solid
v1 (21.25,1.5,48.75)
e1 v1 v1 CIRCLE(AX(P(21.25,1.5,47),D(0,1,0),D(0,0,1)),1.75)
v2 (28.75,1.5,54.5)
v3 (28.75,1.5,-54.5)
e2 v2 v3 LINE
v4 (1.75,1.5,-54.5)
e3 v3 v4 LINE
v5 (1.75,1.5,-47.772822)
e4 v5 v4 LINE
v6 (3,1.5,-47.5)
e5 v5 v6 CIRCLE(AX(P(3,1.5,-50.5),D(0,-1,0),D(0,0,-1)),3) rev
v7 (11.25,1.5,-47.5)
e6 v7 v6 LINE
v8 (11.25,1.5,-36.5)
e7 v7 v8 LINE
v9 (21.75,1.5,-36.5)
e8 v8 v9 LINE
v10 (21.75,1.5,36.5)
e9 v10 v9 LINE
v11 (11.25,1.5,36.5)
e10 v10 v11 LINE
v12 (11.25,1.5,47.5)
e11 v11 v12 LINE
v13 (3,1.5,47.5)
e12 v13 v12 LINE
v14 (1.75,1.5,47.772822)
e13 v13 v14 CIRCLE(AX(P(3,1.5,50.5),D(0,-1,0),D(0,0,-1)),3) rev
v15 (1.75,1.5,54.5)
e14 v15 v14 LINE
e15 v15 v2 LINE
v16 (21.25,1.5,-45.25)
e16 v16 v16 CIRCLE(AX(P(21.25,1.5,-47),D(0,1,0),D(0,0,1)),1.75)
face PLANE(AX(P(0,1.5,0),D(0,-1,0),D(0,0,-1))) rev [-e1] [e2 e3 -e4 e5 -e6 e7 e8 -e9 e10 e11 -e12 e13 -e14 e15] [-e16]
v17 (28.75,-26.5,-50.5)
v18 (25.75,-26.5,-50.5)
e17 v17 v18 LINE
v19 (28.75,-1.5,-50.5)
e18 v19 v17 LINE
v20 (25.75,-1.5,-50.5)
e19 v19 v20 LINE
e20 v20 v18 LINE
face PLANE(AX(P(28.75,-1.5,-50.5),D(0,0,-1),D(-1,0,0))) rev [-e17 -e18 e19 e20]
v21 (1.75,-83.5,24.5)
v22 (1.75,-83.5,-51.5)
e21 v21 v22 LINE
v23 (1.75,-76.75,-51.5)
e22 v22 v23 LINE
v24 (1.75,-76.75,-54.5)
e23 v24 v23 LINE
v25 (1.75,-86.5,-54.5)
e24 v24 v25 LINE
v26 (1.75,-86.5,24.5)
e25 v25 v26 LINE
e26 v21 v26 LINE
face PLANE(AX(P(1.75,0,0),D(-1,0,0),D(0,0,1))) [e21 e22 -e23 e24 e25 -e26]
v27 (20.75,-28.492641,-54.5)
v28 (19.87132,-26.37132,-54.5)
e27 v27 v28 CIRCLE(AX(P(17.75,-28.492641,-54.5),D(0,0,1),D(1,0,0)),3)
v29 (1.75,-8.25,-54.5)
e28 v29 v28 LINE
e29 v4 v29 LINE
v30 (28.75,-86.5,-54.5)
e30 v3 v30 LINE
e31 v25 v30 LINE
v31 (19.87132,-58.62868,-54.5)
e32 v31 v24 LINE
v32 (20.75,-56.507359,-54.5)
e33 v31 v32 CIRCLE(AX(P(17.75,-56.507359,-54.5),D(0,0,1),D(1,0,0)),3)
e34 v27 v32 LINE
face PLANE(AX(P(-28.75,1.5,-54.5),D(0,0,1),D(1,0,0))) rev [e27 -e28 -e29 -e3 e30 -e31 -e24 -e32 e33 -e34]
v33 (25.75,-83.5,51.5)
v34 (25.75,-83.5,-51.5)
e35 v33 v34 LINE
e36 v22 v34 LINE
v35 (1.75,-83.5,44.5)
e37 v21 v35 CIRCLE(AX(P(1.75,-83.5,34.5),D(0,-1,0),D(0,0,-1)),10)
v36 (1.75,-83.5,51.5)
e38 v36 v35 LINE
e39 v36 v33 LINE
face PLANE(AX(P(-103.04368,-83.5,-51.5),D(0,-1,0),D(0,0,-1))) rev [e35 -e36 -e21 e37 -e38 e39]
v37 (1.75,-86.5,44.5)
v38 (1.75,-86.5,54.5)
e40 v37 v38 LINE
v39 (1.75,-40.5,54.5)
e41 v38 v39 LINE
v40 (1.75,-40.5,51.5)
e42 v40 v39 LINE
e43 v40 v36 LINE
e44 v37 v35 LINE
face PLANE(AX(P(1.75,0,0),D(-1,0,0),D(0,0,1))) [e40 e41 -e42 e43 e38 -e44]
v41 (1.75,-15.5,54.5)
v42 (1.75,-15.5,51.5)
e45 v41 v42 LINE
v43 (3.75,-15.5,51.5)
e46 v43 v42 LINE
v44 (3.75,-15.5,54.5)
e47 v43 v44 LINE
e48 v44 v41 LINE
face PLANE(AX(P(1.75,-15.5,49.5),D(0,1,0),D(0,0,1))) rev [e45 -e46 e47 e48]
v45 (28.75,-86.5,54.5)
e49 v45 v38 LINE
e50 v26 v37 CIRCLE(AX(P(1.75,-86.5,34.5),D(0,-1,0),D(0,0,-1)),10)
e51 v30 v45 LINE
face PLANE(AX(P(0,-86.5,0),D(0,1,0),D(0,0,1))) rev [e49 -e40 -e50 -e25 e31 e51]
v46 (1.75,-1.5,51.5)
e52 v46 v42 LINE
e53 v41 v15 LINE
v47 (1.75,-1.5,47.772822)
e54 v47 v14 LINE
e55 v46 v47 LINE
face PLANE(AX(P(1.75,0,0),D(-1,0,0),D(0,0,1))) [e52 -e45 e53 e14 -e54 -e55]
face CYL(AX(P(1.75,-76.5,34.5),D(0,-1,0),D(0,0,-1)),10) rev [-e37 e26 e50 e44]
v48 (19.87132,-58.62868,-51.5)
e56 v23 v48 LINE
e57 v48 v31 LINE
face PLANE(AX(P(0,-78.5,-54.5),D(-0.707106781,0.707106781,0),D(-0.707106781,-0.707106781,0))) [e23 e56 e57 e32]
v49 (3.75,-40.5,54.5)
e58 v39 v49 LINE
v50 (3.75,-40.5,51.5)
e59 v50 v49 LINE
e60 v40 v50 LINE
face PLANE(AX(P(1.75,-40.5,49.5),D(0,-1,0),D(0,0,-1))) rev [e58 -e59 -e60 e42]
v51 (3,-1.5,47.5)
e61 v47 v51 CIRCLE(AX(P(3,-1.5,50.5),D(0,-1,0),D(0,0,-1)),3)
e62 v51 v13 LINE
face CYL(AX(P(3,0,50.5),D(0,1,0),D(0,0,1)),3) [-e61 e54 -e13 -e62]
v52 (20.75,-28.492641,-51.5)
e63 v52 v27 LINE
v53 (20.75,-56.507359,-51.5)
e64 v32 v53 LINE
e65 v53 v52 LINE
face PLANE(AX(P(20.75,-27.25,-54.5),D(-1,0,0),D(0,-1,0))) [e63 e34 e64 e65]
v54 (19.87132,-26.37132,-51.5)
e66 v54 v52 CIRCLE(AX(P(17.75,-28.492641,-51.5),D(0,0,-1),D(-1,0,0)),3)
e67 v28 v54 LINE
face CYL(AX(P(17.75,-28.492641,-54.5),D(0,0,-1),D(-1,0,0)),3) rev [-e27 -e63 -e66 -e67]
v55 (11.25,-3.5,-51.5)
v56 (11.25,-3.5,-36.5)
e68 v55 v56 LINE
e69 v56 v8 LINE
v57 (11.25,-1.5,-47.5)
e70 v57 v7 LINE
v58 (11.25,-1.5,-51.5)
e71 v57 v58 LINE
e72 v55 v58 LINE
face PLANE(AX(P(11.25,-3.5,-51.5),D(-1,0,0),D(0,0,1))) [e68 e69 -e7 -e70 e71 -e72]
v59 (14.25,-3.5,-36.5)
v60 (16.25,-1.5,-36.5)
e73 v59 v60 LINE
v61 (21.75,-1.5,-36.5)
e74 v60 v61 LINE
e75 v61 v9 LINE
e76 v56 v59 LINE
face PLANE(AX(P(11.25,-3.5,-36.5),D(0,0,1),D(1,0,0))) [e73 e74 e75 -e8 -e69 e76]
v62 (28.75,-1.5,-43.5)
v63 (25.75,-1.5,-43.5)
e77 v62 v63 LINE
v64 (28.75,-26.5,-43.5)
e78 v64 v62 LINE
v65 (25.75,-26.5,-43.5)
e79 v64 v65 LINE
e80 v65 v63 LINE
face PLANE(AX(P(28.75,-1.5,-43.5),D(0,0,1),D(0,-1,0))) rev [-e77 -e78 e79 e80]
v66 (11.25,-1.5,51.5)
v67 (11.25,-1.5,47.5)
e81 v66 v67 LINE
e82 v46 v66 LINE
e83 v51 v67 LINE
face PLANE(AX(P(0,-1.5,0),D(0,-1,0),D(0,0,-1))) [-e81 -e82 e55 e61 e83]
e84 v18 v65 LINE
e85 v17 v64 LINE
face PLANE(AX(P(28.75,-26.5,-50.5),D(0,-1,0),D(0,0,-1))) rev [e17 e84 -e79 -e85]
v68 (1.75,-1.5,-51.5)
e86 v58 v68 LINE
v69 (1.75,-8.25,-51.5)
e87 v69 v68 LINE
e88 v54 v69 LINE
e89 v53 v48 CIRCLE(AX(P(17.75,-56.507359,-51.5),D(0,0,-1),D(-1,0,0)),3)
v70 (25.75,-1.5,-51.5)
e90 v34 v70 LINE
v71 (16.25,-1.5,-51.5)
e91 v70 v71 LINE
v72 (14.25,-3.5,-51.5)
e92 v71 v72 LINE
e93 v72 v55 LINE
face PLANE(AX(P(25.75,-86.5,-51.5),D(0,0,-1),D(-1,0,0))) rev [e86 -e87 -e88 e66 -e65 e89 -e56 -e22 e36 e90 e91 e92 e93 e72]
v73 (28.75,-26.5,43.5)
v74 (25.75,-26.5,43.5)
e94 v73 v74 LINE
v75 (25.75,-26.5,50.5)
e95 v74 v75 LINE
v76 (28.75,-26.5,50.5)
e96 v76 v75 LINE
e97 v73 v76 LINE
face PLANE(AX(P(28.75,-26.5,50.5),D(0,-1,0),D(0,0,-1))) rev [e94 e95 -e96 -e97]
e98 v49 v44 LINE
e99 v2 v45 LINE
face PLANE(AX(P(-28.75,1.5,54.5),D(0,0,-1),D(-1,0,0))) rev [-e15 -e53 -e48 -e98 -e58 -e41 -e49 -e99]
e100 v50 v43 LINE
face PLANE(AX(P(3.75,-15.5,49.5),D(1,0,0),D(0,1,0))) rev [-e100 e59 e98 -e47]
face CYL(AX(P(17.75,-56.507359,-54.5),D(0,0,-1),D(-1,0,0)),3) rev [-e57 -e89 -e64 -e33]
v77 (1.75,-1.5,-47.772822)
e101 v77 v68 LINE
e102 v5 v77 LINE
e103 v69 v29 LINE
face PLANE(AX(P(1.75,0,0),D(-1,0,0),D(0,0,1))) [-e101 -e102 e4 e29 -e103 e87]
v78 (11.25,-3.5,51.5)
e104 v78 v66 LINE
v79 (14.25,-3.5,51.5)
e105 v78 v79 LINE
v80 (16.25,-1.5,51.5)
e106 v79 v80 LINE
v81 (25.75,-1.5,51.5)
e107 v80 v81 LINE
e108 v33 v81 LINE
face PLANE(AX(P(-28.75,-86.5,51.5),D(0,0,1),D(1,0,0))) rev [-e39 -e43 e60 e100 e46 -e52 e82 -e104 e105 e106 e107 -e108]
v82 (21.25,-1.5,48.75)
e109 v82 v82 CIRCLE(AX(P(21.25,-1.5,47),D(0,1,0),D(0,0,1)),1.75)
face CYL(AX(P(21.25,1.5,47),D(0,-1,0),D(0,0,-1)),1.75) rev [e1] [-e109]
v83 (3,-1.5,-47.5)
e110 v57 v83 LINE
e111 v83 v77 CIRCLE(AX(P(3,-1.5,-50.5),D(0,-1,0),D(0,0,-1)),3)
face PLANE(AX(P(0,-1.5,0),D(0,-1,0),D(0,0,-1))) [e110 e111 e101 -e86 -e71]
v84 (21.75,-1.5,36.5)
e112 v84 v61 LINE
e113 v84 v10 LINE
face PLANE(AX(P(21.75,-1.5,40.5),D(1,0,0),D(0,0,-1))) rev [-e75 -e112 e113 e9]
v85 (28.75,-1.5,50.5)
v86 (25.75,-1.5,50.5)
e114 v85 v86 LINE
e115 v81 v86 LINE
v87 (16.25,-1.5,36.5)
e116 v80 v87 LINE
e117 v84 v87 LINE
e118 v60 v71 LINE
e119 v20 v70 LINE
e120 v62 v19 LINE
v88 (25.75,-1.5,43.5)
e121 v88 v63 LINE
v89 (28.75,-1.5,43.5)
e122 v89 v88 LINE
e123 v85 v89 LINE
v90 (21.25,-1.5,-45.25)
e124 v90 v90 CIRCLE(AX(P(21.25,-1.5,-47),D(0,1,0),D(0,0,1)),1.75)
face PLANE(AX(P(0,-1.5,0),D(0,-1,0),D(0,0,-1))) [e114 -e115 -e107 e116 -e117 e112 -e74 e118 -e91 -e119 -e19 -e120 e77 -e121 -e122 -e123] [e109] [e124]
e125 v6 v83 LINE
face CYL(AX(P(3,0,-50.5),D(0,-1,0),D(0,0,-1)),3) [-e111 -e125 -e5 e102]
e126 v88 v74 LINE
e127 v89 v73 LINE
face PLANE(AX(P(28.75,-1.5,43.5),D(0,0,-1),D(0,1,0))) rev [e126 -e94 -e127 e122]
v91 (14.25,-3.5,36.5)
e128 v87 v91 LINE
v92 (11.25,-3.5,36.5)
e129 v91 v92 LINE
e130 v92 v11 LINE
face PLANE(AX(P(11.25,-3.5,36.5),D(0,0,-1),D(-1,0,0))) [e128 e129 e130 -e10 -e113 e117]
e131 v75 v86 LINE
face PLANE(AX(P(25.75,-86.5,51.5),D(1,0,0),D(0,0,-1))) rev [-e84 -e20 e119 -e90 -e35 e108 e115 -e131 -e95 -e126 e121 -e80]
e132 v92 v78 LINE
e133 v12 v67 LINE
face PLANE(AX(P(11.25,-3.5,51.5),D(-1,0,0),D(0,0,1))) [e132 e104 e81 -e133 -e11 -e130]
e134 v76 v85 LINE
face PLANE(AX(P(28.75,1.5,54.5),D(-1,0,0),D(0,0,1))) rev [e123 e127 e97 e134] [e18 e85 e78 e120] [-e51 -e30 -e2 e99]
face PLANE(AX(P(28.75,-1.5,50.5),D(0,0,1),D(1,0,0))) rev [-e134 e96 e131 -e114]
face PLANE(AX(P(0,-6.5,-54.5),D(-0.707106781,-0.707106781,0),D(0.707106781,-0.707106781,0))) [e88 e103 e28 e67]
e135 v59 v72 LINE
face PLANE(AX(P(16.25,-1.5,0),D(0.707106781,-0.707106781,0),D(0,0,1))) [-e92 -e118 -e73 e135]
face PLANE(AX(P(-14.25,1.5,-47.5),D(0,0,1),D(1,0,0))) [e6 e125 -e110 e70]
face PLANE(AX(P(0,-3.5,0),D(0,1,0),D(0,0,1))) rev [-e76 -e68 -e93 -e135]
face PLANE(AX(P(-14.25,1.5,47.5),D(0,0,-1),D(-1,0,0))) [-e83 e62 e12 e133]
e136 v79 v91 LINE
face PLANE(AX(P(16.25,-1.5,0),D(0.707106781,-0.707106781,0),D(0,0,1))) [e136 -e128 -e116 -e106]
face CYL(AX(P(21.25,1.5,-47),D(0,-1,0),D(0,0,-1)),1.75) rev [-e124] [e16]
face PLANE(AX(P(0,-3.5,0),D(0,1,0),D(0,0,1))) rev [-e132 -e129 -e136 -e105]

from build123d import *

# Parameters (mm, degrees)
SKETCH1_W           = 57.5
SKETCH1_H           = 109
SKETCH1_R           = 1.75
SKETCH1_W_2         = 28.5
SKETCH1_H_2         = 95
BOSS_EXTRUDE1_DEPTH = 1.5
SKETCH3_W           = 43.5
SKETCH3_H           = 81
CUT_EXTRUDE1_DEPTH  = 3
BOSS_EXTRUDE2_DEPTH = 85
SKETCH5_W           = 145.39083122
SKETCH5_H           = 125.853938275
CUT_EXTRUDE2_DEPTH  = 85
CUT_EXTRUDE3_DEPTH  = 140.802762848
SKETCH8_W           = 103
SKETCH8_H           = 3
BOSS_EXTRUDE3_DEPTH = 25.75
FILLET3_R           = 3
SKETCH13_W          = 109
SKETCH13_H          = 88
CUT_EXTRUDE8_DEPTH  = 1.75
SKETCH14_W          = 2
SKETCH14_H          = 25
CUT_EXTRUDE9_DEPTH  = 5
SKETCH15_W          = 7
SKETCH15_H          = 25
CUT_EXTRUDE10_DEPTH = 106.016665344
SKETCH16_W          = 3
SKETCH16_H          = 15
BOSS_EXTRUDE4_DEPTH = 5
SKETCH17_W          = 7.5
SKETCH17_H          = 4
BOSS_EXTRUDE5_DEPTH = 3
CHAMFER1_SIZE       = 2
SKETCH18_R          = 10
CUT_EXTRUDE11_DEPTH = 10


with BuildPart() as part:
    # Sketch1 → Boss-Extrude1 (new, symmetric)
    with BuildSketch(Plane(origin=(0, 0, 0), x_dir=(1, 0, 0), z_dir=(0, 1, 0))):
        Rectangle(SKETCH1_W, SKETCH1_H)
        with Locations(Location((-21.25, 47, 0), (0, 0, 270))):
            Circle(SKETCH1_R, mode=Mode.SUBTRACT)
        with Locations(Location((21.25, 47, 0), (0, 0, 270))):
            Circle(SKETCH1_R, mode=Mode.SUBTRACT)
        with Locations(Location((21.25, -47, 0), (0, 0, 270))):
            Circle(SKETCH1_R, mode=Mode.SUBTRACT)
        with Locations(Location((-21.25, -47, 0), (0, 0, 270))):
            Circle(SKETCH1_R, mode=Mode.SUBTRACT)
        Rectangle(SKETCH1_W_2, SKETCH1_H_2, mode=Mode.SUBTRACT)
    extrude(amount=BOSS_EXTRUDE1_DEPTH, both=True)

    # Sketch3 → Cut-Extrude1 (cut)
    with BuildSketch(Plane(origin=(0, 1.5, 0), x_dir=(1, 0, 0), z_dir=(0, 1, 0))):
        Rectangle(SKETCH3_W, SKETCH3_H)
    extrude(amount=-CUT_EXTRUDE1_DEPTH, mode=Mode.SUBTRACT)

    # Sketch4 → Boss-Extrude2 (add)
    with BuildSketch(Plane.XZ.offset(1.5)):
        Polygon((28.75, 54.5), (27.30464021, 54.5), (-28.75, 54.5), (-28.75, 51.5), (25.75, 51.5), (25.75, -51.5), (-28.75, -51.5), (-28.75, -54.5), (27.30464021, -54.5), (28.75, -54.5), align=None)
    extrude(amount=BOSS_EXTRUDE2_DEPTH)

    # Sketch5 → Cut-Extrude2 (cut)
    with BuildSketch(Plane(origin=(0, 0, 0), x_dir=(0, 0, -1), z_dir=(1, 0, 0))):
        with Locations((7.269541561, -54.313017537)):
            Rectangle(SKETCH5_W, SKETCH5_H)
    extrude(amount=-CUT_EXTRUDE2_DEPTH, mode=Mode.SUBTRACT)

    # Sketch6 → Cut-Extrude3 (cut, through all)
    with BuildSketch(Plane(origin=(0, 0, 51.5), x_dir=(-1, 0, 0), z_dir=(0, 0, -1))):
        Polygon((0, -6.5), (-20.75, -27.25), (-20.75, -57.75), (0, -78.5), align=None)
    extrude(amount=CUT_EXTRUDE3_DEPTH, mode=Mode.SUBTRACT)

    # Sketch8 → Boss-Extrude3 (add)
    with BuildSketch(Plane.ZY.offset(-25.75)):
        with Locations((0, -85)):
            Rectangle(SKETCH8_W, SKETCH8_H)
    extrude(amount=BOSS_EXTRUDE3_DEPTH)

    # Fillet3
    fillet3_edges = [part.edges().sort_by_distance(p)[0] for p in [
        (0, 0, -47.5),
        (0, 0, 47.5),
        (0, -78.5, -53),
        (20.75, -27.25, -53),
        (0, -6.5, -53),
        (20.75, -57.75, -53),
        (14.25, 0, 47.5),
        (14.25, 0, -47.5),
        (21.75, 0, 40.5),
        (21.75, 0, -40.5),
    ]]
    fillet(fillet3_edges, radius=FILLET3_R)

    # Sketch13 → Cut-Extrude8 (cut)
    with BuildSketch(Plane.ZY):
        with Locations((0, -42.5)):
            Rectangle(SKETCH13_W, SKETCH13_H)
    extrude(amount=-CUT_EXTRUDE8_DEPTH, mode=Mode.SUBTRACT)

    # Sketch14 → Cut-Extrude9 (cut)
    with BuildSketch(Plane.XY.offset(54.5)):
        with Locations((2.75, -28)):
            Rectangle(SKETCH14_W, SKETCH14_H)
    extrude(amount=-CUT_EXTRUDE9_DEPTH, mode=Mode.SUBTRACT)

    # Sketch15 → Cut-Extrude10 (cut, through all)
    with BuildSketch(Plane.ZY.offset(-25.75)):
        with Locations((47, -14)):
            Rectangle(SKETCH15_W, SKETCH15_H)
        with Locations((-47, -14)):
            Rectangle(SKETCH15_W, SKETCH15_H)
    extrude(amount=-CUT_EXTRUDE10_DEPTH, mode=Mode.SUBTRACT)

    # Sketch16 → Boss-Extrude4 (add)
    with BuildSketch(Plane(origin=(0, 1.5, 0), x_dir=(1, 0, 0), z_dir=(0, 1, 0))):
        with Locations((12.75, 44)):
            Rectangle(SKETCH16_W, SKETCH16_H)
        with Locations((12.75, -44)):
            Rectangle(SKETCH16_W, SKETCH16_H)
    extrude(amount=-BOSS_EXTRUDE4_DEPTH)

    # Sketch17 → Boss-Extrude5 (add)
    with BuildSketch(Plane(origin=(0, 1.5, 0), x_dir=(1, 0, 0), z_dir=(0, 1, 0))):
        with Locations((18, 38.5)):
            Rectangle(SKETCH17_W, SKETCH17_H)
        with Locations((18, -38.5)):
            Rectangle(SKETCH17_W, SKETCH17_H)
    extrude(amount=-BOSS_EXTRUDE5_DEPTH)

    # Chamfer1
    chamfer1_edges = [part.edges().sort_by_distance(p)[0] for p in [
        (14.25, -1.5, 44),
        (14.25, -1.5, -44),
    ]]
    chamfer(chamfer1_edges, length=CHAMFER1_SIZE - 0.0001)  # a hair under: the kernel refuses the full size

    # Sketch18 → Cut-Extrude11 (cut)
    with BuildSketch(Plane.XZ.offset(86.5)):
        with Locations((1.75, 34.5)):
            Circle(SKETCH18_R)
    extrude(amount=-CUT_EXTRUDE11_DEPTH, mode=Mode.SUBTRACT)


solid = part.part
